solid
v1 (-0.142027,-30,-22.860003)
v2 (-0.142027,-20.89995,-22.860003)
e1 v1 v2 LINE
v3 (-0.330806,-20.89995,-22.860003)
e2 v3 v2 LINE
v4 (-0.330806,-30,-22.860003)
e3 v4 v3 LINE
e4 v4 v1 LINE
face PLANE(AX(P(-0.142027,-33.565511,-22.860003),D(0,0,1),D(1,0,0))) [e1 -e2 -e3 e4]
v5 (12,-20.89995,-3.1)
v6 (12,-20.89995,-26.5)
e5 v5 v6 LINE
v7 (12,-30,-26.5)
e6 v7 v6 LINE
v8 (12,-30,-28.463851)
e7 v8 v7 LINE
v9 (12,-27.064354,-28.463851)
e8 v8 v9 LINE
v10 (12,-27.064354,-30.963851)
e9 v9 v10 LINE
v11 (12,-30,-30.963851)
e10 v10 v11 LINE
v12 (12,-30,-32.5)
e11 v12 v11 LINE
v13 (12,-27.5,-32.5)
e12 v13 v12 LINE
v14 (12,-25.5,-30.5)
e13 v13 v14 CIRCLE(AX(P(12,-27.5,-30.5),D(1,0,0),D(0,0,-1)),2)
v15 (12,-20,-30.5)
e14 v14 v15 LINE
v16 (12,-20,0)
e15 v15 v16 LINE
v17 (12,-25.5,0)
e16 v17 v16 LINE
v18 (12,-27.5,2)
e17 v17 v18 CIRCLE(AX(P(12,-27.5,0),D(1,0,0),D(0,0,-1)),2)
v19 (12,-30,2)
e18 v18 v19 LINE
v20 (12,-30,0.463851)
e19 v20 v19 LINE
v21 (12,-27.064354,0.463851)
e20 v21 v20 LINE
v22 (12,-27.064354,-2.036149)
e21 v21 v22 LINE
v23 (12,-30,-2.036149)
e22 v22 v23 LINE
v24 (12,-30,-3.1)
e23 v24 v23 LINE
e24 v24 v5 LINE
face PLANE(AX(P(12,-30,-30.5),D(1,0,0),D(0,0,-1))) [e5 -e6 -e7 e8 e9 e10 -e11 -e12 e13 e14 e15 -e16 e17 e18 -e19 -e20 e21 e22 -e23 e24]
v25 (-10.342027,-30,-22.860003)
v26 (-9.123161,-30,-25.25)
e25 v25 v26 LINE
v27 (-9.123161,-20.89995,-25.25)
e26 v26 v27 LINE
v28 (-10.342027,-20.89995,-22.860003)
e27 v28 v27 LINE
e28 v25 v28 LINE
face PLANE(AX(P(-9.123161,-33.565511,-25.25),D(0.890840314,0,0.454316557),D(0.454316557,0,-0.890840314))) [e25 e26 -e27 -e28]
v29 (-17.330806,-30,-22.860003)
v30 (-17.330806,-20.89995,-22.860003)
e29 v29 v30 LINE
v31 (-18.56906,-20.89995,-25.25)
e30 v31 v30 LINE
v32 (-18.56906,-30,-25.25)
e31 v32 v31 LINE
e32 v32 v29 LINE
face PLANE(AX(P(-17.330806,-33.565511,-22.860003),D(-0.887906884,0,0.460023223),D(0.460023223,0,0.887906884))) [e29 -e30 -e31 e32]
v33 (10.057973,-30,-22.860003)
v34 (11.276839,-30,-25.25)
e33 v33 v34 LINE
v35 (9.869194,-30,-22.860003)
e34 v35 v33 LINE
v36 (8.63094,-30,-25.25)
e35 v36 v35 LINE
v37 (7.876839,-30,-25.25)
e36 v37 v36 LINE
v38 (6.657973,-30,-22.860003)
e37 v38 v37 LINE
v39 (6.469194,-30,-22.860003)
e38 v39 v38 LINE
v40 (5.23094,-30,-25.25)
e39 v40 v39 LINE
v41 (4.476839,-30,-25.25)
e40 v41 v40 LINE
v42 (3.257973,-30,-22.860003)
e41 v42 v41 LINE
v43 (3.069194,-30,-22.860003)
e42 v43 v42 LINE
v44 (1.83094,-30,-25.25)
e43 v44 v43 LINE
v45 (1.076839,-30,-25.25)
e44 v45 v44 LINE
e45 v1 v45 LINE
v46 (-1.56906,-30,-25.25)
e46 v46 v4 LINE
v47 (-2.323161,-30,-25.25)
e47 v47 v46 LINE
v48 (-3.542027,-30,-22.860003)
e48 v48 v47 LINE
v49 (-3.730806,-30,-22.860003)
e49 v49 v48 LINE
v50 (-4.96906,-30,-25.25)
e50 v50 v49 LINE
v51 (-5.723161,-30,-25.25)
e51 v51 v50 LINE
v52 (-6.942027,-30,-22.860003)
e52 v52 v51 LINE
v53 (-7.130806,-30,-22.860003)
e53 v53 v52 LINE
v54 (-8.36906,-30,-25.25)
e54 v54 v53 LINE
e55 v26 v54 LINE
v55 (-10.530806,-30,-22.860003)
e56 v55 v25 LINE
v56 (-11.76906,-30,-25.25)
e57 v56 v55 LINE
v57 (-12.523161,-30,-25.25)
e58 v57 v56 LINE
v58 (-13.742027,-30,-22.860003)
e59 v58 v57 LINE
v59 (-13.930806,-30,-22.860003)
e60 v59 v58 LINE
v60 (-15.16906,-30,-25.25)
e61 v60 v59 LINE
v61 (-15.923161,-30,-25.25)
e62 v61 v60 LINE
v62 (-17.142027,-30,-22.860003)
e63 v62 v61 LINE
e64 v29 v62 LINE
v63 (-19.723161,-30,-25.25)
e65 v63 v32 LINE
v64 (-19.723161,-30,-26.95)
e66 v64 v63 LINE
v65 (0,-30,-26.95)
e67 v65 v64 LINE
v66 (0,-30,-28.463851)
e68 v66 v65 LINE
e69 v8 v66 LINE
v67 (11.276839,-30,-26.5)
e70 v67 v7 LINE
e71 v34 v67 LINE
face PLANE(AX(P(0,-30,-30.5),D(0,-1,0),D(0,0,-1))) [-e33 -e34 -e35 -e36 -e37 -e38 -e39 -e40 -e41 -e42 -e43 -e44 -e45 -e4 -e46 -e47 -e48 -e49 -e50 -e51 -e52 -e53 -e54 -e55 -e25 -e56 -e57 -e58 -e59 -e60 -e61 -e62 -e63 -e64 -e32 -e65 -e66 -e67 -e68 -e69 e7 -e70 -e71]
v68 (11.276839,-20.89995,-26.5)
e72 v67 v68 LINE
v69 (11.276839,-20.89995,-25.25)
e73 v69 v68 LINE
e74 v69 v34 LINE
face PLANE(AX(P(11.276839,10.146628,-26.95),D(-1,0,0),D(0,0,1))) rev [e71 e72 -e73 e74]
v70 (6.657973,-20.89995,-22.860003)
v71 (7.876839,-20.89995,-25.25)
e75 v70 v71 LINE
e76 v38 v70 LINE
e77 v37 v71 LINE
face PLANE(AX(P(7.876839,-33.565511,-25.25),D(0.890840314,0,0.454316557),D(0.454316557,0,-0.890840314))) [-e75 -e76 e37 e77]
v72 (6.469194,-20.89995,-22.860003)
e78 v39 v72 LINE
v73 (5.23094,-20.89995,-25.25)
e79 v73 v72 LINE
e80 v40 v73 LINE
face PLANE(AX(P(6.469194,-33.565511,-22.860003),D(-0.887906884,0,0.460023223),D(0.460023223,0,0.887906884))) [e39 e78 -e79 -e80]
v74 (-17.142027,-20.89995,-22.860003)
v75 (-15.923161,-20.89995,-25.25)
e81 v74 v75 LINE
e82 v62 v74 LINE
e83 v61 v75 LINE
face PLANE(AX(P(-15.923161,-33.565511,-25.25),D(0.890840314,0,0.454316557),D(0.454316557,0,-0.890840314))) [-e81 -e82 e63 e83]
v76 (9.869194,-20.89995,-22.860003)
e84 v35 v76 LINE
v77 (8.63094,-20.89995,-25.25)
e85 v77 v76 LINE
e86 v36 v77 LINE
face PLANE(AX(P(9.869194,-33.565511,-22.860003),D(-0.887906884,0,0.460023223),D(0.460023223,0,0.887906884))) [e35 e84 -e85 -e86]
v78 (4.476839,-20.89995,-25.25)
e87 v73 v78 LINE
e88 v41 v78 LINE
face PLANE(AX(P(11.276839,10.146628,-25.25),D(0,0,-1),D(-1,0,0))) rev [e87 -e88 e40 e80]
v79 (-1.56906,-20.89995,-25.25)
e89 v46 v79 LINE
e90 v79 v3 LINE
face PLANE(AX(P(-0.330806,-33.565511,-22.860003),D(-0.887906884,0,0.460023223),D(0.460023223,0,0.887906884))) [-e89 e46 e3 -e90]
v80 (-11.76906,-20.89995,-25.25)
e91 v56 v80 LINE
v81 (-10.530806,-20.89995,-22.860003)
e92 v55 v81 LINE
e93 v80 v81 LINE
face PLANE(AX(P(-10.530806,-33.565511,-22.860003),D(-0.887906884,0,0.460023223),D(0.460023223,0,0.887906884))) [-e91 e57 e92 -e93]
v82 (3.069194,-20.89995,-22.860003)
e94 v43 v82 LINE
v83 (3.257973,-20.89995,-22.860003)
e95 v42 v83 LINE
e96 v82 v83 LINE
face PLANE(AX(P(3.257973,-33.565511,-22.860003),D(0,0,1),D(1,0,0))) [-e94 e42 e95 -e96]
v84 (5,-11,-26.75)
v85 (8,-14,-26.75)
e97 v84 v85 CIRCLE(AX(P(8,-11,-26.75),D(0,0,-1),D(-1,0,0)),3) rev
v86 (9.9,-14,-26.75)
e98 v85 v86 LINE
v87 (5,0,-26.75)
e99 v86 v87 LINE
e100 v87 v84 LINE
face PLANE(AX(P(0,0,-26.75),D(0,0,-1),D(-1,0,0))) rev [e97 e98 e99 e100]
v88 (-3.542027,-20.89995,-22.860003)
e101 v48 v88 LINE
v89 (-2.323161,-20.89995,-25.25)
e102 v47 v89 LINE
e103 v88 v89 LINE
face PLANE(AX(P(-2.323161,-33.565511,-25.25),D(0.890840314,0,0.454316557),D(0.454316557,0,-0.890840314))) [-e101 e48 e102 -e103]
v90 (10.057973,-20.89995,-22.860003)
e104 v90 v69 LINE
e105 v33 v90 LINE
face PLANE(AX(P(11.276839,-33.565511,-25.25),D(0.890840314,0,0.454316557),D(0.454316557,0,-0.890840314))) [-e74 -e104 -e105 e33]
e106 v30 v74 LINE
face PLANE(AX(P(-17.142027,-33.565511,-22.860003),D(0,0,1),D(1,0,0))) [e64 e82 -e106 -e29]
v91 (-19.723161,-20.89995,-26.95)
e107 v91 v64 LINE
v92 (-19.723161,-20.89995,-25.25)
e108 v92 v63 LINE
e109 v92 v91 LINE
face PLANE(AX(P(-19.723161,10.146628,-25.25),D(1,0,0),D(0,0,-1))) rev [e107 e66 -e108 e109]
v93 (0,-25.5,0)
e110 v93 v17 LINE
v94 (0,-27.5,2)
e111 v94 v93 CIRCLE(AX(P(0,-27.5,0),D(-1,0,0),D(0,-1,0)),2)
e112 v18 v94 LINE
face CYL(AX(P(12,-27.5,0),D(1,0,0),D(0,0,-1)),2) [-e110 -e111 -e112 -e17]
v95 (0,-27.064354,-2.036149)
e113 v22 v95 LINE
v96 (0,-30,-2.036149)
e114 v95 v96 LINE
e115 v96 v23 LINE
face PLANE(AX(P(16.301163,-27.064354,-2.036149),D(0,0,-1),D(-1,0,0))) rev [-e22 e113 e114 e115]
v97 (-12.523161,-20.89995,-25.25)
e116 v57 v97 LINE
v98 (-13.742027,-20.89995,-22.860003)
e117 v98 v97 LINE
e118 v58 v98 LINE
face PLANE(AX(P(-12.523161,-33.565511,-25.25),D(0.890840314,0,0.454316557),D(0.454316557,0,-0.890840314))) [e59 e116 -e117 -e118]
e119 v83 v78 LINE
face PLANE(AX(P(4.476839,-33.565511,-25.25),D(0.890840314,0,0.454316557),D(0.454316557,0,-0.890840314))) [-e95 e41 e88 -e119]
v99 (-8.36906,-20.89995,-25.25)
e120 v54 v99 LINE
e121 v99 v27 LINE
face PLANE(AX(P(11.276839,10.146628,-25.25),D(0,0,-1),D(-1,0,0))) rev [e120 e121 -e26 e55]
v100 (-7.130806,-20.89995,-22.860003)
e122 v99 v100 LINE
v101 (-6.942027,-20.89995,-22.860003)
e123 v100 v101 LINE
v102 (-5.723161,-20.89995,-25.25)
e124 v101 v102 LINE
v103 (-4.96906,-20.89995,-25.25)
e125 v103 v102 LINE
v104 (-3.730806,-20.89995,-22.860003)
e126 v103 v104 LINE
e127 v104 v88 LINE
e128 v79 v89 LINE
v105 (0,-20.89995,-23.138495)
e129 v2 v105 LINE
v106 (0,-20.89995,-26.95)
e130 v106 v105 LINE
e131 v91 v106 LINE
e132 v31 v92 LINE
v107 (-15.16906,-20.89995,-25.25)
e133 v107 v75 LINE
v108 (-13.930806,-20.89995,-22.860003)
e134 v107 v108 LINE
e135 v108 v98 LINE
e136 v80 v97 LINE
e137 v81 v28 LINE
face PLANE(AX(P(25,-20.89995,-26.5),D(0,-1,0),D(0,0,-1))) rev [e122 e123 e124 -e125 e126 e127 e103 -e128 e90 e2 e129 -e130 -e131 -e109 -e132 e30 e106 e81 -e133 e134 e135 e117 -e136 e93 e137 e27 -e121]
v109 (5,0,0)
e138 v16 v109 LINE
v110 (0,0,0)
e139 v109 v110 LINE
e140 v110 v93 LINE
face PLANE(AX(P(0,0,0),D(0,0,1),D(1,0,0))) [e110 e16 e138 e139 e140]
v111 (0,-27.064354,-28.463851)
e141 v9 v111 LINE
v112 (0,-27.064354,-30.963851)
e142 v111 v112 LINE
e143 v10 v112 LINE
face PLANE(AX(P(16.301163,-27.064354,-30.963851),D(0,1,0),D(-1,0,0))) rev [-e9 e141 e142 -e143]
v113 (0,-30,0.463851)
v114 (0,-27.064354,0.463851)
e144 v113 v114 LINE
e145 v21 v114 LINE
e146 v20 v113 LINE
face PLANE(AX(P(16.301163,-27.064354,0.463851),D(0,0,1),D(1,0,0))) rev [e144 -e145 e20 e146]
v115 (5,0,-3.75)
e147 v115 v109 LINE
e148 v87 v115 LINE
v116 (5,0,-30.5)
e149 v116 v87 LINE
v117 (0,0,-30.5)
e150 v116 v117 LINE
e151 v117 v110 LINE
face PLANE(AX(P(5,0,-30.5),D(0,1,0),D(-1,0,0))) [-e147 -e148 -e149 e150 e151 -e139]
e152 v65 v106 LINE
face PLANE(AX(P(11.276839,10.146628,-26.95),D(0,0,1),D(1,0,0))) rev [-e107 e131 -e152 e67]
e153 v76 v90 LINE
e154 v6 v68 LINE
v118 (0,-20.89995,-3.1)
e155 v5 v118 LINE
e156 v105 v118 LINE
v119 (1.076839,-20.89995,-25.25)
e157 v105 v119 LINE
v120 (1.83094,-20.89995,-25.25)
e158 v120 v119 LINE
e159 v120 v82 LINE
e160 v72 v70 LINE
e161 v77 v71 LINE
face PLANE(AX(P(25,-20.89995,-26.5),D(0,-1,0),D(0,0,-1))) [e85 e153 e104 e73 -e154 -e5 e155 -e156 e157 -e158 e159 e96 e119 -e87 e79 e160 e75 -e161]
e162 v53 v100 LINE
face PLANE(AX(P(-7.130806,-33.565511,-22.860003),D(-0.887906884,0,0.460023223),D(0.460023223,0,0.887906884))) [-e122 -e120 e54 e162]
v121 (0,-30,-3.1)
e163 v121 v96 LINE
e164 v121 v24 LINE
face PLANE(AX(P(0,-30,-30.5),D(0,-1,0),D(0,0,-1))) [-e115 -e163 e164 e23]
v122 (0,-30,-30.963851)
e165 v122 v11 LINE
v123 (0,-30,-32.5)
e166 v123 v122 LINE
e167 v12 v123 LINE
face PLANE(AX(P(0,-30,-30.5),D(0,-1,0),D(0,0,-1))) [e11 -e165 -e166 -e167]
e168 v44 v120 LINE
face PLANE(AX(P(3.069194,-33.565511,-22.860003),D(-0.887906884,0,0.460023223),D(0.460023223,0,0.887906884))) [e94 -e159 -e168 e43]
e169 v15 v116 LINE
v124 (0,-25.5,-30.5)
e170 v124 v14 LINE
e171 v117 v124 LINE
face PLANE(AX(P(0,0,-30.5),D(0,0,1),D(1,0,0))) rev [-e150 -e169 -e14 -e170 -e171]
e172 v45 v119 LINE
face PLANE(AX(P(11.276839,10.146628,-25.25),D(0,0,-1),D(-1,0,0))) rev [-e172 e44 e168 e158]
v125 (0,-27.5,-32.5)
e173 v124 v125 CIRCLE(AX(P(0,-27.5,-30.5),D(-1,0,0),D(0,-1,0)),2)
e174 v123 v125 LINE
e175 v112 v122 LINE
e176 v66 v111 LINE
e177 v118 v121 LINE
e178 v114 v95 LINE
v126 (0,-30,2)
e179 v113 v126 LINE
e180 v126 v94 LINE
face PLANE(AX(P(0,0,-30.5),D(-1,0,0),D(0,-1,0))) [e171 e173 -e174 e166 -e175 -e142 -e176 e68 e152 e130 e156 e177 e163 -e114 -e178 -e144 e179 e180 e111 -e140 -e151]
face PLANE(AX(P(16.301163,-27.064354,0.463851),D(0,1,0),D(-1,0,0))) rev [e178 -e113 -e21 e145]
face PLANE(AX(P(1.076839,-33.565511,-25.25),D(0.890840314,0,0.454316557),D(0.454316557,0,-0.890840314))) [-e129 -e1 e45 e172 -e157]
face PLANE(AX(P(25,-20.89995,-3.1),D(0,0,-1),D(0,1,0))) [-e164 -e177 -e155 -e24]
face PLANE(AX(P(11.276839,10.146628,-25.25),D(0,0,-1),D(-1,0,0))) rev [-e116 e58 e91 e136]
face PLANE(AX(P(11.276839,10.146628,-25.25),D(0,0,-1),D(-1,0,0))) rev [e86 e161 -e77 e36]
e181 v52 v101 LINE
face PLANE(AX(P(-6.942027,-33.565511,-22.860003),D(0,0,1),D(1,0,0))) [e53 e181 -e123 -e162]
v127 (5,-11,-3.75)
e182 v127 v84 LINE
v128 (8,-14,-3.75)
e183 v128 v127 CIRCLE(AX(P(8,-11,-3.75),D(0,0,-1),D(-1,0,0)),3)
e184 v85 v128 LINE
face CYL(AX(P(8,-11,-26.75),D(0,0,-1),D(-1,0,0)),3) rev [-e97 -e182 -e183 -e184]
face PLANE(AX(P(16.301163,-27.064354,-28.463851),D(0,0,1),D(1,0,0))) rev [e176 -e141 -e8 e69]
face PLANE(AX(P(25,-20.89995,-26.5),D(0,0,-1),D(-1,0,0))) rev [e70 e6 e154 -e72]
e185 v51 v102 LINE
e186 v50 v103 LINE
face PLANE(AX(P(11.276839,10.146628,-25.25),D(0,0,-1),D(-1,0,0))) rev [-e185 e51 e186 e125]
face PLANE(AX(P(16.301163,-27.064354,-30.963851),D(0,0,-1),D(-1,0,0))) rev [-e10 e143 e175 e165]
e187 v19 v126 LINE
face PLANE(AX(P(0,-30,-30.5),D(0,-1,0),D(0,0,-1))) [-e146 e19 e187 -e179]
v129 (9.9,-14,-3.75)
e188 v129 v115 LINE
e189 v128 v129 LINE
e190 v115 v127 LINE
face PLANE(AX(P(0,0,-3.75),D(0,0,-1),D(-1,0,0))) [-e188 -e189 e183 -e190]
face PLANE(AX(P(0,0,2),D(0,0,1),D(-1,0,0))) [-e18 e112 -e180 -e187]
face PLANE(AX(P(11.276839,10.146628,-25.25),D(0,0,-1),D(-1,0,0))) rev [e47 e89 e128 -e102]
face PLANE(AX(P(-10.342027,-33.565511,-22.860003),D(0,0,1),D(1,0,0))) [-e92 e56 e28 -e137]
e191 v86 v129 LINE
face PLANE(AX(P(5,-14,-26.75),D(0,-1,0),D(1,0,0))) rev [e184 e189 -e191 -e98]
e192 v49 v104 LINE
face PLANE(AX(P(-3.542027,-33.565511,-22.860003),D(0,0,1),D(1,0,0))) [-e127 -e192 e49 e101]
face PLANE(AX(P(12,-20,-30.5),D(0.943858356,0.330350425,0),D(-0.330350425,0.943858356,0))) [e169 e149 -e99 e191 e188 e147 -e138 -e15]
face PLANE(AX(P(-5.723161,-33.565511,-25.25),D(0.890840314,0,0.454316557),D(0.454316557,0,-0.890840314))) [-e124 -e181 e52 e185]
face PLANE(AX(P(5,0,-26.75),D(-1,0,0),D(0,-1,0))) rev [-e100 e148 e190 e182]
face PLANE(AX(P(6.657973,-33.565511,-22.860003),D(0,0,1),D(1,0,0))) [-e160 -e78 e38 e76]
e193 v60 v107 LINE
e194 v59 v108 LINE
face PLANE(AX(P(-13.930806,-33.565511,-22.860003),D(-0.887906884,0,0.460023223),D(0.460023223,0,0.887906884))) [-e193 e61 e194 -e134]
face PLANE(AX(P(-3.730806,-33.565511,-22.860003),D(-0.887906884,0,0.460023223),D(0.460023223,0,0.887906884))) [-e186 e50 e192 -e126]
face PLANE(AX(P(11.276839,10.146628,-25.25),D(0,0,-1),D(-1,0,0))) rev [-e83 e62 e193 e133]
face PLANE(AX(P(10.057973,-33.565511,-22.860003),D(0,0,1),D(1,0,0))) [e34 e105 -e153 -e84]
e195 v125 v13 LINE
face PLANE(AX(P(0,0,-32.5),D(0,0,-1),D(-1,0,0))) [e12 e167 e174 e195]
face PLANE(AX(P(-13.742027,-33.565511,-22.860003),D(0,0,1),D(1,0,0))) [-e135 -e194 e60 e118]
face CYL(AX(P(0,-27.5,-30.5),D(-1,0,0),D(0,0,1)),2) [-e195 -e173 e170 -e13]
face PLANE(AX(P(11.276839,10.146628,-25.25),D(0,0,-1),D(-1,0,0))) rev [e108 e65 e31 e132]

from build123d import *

# Parameters (mm, degrees)
BOSS_EXTRUDE1_DEPTH = 30.5
SKETCH4_W           = 23.4
SKETCH4_H           = 10
CUT_EXTRUDE2_DEPTH  = 25
CUT_EXTRUDE4_DEPTH  = 11.5
SKETCH7_W           = 31
SKETCH7_H           = 1.7
BOSS_EXTRUDE3_DEPTH = 9.100050305
BOSS_EXTRUDE4_DEPTH = 9.100050305
LPATTERN1_COUNT     = 9
LPATTERN1_PITCH     = 3.4
SKETCH11_W          = 12
SKETCH11_H          = 4.5
BOSS_EXTRUDE5_DEPTH = 2
FILLET1_R           = 2
FILLET2_R           = 2
FILLET5_R           = 3
SKETCH12_W          = 2.5
SKETCH12_H          = 3.5
CUT_EXTRUDE5_DEPTH  = 12


with BuildPart() as part:
    # Sketch1 → Boss-Extrude1 (new body)
    with BuildSketch(Plane.XY):
        Polygon((0, 0), (0, -30), (12, -30), (12, -20), (5, 0), align=None)
    extrude(amount=-BOSS_EXTRUDE1_DEPTH)

    # Sketch4 → Cut-Extrude2 (cut)
    with BuildSketch(Plane.ZY):
        with Locations((-14.8, -25.899949695)):
            Rectangle(SKETCH4_W, SKETCH4_H)
    extrude(amount=-CUT_EXTRUDE2_DEPTH, mode=Mode.SUBTRACT)

    # Sketch6 → Cut-Extrude4 (cut, symmetric)
    with BuildSketch(Plane.XY.offset(-15.25)):
        Polygon((5, 0), (5, -14), (9.9, -14), align=None)
    extrude(amount=CUT_EXTRUDE4_DEPTH, both=True, mode=Mode.SUBTRACT)

    # Sketch7 → Boss-Extrude3 (add)
    with BuildSketch(Plane(origin=(0, -30, 0), x_dir=(1, 0, 0), z_dir=(0, 1, 0))):
        with Locations((-4.2231607, 26.1)):
            Rectangle(SKETCH7_W, SKETCH7_H)
    extrude(amount=BOSS_EXTRUDE3_DEPTH)

    # Sketch10 → Boss-Extrude4 (add)
    with BuildSketch(Plane(origin=(0, -20.899949695, 0), x_dir=(1, 0, 0), z_dir=(0, 1, 0))):
        Polygon((11.2768393, 25.25), (10.057972835, 22.860002615), (9.869194152, 22.860002615), (8.630940097, 25.25), align=None)
    boss_extrude4 = extrude(amount=-BOSS_EXTRUDE4_DEPTH)

    # LPattern1: Boss-Extrude4 ×9
    with Locations(*[(-i * LPATTERN1_PITCH, 0, 0) for i in range(1, LPATTERN1_COUNT)]):
        add(boss_extrude4)

    # Sketch11 → Boss-Extrude5 (add)
    with BuildSketch(Plane(origin=(0, 0, -30.5), x_dir=(-1, 0, 0), z_dir=(0, 0, -1))):
        with Locations((-6, -27.75)):
            Rectangle(SKETCH11_W, SKETCH11_H)
    boss_extrude5 = extrude(amount=BOSS_EXTRUDE5_DEPTH)

    # Fillet1
    fillet1_edges = [part.edges().sort_by_distance(p)[0] for p in [
        (6, -25.5, -32.5),
    ]]
    fillet(fillet1_edges, radius=FILLET1_R - 0.0001)  # a hair under: the kernel refuses the full size

    # Mirror1: Boss-Extrude5 across plane
    add(boss_extrude5.mirror(Plane.XY.offset(-15.25)))

    # Fillet2
    fillet2_edges = [part.edges().sort_by_distance(p)[0] for p in [
        (6, -25.5, 2),
    ]]
    fillet(fillet2_edges, radius=FILLET2_R - 0.0001)  # a hair under: the kernel refuses the full size

    # Fillet5
    fillet5_edges = [part.edges().sort_by_distance(p)[0] for p in [
        (5, -14, -15.25),
    ]]
    fillet(fillet5_edges, radius=FILLET5_R)

    # Sketch12 → Cut-Extrude5 (cut)
    with BuildSketch(Plane.ZY):
        with Locations((-29.713851252, -28.814354386)):
            Rectangle(SKETCH12_W, SKETCH12_H)
        with Locations((-0.786148748, -28.814354386)):
            Rectangle(SKETCH12_W, SKETCH12_H)
    extrude(amount=-CUT_EXTRUDE5_DEPTH, mode=Mode.SUBTRACT)


solid = part.part
